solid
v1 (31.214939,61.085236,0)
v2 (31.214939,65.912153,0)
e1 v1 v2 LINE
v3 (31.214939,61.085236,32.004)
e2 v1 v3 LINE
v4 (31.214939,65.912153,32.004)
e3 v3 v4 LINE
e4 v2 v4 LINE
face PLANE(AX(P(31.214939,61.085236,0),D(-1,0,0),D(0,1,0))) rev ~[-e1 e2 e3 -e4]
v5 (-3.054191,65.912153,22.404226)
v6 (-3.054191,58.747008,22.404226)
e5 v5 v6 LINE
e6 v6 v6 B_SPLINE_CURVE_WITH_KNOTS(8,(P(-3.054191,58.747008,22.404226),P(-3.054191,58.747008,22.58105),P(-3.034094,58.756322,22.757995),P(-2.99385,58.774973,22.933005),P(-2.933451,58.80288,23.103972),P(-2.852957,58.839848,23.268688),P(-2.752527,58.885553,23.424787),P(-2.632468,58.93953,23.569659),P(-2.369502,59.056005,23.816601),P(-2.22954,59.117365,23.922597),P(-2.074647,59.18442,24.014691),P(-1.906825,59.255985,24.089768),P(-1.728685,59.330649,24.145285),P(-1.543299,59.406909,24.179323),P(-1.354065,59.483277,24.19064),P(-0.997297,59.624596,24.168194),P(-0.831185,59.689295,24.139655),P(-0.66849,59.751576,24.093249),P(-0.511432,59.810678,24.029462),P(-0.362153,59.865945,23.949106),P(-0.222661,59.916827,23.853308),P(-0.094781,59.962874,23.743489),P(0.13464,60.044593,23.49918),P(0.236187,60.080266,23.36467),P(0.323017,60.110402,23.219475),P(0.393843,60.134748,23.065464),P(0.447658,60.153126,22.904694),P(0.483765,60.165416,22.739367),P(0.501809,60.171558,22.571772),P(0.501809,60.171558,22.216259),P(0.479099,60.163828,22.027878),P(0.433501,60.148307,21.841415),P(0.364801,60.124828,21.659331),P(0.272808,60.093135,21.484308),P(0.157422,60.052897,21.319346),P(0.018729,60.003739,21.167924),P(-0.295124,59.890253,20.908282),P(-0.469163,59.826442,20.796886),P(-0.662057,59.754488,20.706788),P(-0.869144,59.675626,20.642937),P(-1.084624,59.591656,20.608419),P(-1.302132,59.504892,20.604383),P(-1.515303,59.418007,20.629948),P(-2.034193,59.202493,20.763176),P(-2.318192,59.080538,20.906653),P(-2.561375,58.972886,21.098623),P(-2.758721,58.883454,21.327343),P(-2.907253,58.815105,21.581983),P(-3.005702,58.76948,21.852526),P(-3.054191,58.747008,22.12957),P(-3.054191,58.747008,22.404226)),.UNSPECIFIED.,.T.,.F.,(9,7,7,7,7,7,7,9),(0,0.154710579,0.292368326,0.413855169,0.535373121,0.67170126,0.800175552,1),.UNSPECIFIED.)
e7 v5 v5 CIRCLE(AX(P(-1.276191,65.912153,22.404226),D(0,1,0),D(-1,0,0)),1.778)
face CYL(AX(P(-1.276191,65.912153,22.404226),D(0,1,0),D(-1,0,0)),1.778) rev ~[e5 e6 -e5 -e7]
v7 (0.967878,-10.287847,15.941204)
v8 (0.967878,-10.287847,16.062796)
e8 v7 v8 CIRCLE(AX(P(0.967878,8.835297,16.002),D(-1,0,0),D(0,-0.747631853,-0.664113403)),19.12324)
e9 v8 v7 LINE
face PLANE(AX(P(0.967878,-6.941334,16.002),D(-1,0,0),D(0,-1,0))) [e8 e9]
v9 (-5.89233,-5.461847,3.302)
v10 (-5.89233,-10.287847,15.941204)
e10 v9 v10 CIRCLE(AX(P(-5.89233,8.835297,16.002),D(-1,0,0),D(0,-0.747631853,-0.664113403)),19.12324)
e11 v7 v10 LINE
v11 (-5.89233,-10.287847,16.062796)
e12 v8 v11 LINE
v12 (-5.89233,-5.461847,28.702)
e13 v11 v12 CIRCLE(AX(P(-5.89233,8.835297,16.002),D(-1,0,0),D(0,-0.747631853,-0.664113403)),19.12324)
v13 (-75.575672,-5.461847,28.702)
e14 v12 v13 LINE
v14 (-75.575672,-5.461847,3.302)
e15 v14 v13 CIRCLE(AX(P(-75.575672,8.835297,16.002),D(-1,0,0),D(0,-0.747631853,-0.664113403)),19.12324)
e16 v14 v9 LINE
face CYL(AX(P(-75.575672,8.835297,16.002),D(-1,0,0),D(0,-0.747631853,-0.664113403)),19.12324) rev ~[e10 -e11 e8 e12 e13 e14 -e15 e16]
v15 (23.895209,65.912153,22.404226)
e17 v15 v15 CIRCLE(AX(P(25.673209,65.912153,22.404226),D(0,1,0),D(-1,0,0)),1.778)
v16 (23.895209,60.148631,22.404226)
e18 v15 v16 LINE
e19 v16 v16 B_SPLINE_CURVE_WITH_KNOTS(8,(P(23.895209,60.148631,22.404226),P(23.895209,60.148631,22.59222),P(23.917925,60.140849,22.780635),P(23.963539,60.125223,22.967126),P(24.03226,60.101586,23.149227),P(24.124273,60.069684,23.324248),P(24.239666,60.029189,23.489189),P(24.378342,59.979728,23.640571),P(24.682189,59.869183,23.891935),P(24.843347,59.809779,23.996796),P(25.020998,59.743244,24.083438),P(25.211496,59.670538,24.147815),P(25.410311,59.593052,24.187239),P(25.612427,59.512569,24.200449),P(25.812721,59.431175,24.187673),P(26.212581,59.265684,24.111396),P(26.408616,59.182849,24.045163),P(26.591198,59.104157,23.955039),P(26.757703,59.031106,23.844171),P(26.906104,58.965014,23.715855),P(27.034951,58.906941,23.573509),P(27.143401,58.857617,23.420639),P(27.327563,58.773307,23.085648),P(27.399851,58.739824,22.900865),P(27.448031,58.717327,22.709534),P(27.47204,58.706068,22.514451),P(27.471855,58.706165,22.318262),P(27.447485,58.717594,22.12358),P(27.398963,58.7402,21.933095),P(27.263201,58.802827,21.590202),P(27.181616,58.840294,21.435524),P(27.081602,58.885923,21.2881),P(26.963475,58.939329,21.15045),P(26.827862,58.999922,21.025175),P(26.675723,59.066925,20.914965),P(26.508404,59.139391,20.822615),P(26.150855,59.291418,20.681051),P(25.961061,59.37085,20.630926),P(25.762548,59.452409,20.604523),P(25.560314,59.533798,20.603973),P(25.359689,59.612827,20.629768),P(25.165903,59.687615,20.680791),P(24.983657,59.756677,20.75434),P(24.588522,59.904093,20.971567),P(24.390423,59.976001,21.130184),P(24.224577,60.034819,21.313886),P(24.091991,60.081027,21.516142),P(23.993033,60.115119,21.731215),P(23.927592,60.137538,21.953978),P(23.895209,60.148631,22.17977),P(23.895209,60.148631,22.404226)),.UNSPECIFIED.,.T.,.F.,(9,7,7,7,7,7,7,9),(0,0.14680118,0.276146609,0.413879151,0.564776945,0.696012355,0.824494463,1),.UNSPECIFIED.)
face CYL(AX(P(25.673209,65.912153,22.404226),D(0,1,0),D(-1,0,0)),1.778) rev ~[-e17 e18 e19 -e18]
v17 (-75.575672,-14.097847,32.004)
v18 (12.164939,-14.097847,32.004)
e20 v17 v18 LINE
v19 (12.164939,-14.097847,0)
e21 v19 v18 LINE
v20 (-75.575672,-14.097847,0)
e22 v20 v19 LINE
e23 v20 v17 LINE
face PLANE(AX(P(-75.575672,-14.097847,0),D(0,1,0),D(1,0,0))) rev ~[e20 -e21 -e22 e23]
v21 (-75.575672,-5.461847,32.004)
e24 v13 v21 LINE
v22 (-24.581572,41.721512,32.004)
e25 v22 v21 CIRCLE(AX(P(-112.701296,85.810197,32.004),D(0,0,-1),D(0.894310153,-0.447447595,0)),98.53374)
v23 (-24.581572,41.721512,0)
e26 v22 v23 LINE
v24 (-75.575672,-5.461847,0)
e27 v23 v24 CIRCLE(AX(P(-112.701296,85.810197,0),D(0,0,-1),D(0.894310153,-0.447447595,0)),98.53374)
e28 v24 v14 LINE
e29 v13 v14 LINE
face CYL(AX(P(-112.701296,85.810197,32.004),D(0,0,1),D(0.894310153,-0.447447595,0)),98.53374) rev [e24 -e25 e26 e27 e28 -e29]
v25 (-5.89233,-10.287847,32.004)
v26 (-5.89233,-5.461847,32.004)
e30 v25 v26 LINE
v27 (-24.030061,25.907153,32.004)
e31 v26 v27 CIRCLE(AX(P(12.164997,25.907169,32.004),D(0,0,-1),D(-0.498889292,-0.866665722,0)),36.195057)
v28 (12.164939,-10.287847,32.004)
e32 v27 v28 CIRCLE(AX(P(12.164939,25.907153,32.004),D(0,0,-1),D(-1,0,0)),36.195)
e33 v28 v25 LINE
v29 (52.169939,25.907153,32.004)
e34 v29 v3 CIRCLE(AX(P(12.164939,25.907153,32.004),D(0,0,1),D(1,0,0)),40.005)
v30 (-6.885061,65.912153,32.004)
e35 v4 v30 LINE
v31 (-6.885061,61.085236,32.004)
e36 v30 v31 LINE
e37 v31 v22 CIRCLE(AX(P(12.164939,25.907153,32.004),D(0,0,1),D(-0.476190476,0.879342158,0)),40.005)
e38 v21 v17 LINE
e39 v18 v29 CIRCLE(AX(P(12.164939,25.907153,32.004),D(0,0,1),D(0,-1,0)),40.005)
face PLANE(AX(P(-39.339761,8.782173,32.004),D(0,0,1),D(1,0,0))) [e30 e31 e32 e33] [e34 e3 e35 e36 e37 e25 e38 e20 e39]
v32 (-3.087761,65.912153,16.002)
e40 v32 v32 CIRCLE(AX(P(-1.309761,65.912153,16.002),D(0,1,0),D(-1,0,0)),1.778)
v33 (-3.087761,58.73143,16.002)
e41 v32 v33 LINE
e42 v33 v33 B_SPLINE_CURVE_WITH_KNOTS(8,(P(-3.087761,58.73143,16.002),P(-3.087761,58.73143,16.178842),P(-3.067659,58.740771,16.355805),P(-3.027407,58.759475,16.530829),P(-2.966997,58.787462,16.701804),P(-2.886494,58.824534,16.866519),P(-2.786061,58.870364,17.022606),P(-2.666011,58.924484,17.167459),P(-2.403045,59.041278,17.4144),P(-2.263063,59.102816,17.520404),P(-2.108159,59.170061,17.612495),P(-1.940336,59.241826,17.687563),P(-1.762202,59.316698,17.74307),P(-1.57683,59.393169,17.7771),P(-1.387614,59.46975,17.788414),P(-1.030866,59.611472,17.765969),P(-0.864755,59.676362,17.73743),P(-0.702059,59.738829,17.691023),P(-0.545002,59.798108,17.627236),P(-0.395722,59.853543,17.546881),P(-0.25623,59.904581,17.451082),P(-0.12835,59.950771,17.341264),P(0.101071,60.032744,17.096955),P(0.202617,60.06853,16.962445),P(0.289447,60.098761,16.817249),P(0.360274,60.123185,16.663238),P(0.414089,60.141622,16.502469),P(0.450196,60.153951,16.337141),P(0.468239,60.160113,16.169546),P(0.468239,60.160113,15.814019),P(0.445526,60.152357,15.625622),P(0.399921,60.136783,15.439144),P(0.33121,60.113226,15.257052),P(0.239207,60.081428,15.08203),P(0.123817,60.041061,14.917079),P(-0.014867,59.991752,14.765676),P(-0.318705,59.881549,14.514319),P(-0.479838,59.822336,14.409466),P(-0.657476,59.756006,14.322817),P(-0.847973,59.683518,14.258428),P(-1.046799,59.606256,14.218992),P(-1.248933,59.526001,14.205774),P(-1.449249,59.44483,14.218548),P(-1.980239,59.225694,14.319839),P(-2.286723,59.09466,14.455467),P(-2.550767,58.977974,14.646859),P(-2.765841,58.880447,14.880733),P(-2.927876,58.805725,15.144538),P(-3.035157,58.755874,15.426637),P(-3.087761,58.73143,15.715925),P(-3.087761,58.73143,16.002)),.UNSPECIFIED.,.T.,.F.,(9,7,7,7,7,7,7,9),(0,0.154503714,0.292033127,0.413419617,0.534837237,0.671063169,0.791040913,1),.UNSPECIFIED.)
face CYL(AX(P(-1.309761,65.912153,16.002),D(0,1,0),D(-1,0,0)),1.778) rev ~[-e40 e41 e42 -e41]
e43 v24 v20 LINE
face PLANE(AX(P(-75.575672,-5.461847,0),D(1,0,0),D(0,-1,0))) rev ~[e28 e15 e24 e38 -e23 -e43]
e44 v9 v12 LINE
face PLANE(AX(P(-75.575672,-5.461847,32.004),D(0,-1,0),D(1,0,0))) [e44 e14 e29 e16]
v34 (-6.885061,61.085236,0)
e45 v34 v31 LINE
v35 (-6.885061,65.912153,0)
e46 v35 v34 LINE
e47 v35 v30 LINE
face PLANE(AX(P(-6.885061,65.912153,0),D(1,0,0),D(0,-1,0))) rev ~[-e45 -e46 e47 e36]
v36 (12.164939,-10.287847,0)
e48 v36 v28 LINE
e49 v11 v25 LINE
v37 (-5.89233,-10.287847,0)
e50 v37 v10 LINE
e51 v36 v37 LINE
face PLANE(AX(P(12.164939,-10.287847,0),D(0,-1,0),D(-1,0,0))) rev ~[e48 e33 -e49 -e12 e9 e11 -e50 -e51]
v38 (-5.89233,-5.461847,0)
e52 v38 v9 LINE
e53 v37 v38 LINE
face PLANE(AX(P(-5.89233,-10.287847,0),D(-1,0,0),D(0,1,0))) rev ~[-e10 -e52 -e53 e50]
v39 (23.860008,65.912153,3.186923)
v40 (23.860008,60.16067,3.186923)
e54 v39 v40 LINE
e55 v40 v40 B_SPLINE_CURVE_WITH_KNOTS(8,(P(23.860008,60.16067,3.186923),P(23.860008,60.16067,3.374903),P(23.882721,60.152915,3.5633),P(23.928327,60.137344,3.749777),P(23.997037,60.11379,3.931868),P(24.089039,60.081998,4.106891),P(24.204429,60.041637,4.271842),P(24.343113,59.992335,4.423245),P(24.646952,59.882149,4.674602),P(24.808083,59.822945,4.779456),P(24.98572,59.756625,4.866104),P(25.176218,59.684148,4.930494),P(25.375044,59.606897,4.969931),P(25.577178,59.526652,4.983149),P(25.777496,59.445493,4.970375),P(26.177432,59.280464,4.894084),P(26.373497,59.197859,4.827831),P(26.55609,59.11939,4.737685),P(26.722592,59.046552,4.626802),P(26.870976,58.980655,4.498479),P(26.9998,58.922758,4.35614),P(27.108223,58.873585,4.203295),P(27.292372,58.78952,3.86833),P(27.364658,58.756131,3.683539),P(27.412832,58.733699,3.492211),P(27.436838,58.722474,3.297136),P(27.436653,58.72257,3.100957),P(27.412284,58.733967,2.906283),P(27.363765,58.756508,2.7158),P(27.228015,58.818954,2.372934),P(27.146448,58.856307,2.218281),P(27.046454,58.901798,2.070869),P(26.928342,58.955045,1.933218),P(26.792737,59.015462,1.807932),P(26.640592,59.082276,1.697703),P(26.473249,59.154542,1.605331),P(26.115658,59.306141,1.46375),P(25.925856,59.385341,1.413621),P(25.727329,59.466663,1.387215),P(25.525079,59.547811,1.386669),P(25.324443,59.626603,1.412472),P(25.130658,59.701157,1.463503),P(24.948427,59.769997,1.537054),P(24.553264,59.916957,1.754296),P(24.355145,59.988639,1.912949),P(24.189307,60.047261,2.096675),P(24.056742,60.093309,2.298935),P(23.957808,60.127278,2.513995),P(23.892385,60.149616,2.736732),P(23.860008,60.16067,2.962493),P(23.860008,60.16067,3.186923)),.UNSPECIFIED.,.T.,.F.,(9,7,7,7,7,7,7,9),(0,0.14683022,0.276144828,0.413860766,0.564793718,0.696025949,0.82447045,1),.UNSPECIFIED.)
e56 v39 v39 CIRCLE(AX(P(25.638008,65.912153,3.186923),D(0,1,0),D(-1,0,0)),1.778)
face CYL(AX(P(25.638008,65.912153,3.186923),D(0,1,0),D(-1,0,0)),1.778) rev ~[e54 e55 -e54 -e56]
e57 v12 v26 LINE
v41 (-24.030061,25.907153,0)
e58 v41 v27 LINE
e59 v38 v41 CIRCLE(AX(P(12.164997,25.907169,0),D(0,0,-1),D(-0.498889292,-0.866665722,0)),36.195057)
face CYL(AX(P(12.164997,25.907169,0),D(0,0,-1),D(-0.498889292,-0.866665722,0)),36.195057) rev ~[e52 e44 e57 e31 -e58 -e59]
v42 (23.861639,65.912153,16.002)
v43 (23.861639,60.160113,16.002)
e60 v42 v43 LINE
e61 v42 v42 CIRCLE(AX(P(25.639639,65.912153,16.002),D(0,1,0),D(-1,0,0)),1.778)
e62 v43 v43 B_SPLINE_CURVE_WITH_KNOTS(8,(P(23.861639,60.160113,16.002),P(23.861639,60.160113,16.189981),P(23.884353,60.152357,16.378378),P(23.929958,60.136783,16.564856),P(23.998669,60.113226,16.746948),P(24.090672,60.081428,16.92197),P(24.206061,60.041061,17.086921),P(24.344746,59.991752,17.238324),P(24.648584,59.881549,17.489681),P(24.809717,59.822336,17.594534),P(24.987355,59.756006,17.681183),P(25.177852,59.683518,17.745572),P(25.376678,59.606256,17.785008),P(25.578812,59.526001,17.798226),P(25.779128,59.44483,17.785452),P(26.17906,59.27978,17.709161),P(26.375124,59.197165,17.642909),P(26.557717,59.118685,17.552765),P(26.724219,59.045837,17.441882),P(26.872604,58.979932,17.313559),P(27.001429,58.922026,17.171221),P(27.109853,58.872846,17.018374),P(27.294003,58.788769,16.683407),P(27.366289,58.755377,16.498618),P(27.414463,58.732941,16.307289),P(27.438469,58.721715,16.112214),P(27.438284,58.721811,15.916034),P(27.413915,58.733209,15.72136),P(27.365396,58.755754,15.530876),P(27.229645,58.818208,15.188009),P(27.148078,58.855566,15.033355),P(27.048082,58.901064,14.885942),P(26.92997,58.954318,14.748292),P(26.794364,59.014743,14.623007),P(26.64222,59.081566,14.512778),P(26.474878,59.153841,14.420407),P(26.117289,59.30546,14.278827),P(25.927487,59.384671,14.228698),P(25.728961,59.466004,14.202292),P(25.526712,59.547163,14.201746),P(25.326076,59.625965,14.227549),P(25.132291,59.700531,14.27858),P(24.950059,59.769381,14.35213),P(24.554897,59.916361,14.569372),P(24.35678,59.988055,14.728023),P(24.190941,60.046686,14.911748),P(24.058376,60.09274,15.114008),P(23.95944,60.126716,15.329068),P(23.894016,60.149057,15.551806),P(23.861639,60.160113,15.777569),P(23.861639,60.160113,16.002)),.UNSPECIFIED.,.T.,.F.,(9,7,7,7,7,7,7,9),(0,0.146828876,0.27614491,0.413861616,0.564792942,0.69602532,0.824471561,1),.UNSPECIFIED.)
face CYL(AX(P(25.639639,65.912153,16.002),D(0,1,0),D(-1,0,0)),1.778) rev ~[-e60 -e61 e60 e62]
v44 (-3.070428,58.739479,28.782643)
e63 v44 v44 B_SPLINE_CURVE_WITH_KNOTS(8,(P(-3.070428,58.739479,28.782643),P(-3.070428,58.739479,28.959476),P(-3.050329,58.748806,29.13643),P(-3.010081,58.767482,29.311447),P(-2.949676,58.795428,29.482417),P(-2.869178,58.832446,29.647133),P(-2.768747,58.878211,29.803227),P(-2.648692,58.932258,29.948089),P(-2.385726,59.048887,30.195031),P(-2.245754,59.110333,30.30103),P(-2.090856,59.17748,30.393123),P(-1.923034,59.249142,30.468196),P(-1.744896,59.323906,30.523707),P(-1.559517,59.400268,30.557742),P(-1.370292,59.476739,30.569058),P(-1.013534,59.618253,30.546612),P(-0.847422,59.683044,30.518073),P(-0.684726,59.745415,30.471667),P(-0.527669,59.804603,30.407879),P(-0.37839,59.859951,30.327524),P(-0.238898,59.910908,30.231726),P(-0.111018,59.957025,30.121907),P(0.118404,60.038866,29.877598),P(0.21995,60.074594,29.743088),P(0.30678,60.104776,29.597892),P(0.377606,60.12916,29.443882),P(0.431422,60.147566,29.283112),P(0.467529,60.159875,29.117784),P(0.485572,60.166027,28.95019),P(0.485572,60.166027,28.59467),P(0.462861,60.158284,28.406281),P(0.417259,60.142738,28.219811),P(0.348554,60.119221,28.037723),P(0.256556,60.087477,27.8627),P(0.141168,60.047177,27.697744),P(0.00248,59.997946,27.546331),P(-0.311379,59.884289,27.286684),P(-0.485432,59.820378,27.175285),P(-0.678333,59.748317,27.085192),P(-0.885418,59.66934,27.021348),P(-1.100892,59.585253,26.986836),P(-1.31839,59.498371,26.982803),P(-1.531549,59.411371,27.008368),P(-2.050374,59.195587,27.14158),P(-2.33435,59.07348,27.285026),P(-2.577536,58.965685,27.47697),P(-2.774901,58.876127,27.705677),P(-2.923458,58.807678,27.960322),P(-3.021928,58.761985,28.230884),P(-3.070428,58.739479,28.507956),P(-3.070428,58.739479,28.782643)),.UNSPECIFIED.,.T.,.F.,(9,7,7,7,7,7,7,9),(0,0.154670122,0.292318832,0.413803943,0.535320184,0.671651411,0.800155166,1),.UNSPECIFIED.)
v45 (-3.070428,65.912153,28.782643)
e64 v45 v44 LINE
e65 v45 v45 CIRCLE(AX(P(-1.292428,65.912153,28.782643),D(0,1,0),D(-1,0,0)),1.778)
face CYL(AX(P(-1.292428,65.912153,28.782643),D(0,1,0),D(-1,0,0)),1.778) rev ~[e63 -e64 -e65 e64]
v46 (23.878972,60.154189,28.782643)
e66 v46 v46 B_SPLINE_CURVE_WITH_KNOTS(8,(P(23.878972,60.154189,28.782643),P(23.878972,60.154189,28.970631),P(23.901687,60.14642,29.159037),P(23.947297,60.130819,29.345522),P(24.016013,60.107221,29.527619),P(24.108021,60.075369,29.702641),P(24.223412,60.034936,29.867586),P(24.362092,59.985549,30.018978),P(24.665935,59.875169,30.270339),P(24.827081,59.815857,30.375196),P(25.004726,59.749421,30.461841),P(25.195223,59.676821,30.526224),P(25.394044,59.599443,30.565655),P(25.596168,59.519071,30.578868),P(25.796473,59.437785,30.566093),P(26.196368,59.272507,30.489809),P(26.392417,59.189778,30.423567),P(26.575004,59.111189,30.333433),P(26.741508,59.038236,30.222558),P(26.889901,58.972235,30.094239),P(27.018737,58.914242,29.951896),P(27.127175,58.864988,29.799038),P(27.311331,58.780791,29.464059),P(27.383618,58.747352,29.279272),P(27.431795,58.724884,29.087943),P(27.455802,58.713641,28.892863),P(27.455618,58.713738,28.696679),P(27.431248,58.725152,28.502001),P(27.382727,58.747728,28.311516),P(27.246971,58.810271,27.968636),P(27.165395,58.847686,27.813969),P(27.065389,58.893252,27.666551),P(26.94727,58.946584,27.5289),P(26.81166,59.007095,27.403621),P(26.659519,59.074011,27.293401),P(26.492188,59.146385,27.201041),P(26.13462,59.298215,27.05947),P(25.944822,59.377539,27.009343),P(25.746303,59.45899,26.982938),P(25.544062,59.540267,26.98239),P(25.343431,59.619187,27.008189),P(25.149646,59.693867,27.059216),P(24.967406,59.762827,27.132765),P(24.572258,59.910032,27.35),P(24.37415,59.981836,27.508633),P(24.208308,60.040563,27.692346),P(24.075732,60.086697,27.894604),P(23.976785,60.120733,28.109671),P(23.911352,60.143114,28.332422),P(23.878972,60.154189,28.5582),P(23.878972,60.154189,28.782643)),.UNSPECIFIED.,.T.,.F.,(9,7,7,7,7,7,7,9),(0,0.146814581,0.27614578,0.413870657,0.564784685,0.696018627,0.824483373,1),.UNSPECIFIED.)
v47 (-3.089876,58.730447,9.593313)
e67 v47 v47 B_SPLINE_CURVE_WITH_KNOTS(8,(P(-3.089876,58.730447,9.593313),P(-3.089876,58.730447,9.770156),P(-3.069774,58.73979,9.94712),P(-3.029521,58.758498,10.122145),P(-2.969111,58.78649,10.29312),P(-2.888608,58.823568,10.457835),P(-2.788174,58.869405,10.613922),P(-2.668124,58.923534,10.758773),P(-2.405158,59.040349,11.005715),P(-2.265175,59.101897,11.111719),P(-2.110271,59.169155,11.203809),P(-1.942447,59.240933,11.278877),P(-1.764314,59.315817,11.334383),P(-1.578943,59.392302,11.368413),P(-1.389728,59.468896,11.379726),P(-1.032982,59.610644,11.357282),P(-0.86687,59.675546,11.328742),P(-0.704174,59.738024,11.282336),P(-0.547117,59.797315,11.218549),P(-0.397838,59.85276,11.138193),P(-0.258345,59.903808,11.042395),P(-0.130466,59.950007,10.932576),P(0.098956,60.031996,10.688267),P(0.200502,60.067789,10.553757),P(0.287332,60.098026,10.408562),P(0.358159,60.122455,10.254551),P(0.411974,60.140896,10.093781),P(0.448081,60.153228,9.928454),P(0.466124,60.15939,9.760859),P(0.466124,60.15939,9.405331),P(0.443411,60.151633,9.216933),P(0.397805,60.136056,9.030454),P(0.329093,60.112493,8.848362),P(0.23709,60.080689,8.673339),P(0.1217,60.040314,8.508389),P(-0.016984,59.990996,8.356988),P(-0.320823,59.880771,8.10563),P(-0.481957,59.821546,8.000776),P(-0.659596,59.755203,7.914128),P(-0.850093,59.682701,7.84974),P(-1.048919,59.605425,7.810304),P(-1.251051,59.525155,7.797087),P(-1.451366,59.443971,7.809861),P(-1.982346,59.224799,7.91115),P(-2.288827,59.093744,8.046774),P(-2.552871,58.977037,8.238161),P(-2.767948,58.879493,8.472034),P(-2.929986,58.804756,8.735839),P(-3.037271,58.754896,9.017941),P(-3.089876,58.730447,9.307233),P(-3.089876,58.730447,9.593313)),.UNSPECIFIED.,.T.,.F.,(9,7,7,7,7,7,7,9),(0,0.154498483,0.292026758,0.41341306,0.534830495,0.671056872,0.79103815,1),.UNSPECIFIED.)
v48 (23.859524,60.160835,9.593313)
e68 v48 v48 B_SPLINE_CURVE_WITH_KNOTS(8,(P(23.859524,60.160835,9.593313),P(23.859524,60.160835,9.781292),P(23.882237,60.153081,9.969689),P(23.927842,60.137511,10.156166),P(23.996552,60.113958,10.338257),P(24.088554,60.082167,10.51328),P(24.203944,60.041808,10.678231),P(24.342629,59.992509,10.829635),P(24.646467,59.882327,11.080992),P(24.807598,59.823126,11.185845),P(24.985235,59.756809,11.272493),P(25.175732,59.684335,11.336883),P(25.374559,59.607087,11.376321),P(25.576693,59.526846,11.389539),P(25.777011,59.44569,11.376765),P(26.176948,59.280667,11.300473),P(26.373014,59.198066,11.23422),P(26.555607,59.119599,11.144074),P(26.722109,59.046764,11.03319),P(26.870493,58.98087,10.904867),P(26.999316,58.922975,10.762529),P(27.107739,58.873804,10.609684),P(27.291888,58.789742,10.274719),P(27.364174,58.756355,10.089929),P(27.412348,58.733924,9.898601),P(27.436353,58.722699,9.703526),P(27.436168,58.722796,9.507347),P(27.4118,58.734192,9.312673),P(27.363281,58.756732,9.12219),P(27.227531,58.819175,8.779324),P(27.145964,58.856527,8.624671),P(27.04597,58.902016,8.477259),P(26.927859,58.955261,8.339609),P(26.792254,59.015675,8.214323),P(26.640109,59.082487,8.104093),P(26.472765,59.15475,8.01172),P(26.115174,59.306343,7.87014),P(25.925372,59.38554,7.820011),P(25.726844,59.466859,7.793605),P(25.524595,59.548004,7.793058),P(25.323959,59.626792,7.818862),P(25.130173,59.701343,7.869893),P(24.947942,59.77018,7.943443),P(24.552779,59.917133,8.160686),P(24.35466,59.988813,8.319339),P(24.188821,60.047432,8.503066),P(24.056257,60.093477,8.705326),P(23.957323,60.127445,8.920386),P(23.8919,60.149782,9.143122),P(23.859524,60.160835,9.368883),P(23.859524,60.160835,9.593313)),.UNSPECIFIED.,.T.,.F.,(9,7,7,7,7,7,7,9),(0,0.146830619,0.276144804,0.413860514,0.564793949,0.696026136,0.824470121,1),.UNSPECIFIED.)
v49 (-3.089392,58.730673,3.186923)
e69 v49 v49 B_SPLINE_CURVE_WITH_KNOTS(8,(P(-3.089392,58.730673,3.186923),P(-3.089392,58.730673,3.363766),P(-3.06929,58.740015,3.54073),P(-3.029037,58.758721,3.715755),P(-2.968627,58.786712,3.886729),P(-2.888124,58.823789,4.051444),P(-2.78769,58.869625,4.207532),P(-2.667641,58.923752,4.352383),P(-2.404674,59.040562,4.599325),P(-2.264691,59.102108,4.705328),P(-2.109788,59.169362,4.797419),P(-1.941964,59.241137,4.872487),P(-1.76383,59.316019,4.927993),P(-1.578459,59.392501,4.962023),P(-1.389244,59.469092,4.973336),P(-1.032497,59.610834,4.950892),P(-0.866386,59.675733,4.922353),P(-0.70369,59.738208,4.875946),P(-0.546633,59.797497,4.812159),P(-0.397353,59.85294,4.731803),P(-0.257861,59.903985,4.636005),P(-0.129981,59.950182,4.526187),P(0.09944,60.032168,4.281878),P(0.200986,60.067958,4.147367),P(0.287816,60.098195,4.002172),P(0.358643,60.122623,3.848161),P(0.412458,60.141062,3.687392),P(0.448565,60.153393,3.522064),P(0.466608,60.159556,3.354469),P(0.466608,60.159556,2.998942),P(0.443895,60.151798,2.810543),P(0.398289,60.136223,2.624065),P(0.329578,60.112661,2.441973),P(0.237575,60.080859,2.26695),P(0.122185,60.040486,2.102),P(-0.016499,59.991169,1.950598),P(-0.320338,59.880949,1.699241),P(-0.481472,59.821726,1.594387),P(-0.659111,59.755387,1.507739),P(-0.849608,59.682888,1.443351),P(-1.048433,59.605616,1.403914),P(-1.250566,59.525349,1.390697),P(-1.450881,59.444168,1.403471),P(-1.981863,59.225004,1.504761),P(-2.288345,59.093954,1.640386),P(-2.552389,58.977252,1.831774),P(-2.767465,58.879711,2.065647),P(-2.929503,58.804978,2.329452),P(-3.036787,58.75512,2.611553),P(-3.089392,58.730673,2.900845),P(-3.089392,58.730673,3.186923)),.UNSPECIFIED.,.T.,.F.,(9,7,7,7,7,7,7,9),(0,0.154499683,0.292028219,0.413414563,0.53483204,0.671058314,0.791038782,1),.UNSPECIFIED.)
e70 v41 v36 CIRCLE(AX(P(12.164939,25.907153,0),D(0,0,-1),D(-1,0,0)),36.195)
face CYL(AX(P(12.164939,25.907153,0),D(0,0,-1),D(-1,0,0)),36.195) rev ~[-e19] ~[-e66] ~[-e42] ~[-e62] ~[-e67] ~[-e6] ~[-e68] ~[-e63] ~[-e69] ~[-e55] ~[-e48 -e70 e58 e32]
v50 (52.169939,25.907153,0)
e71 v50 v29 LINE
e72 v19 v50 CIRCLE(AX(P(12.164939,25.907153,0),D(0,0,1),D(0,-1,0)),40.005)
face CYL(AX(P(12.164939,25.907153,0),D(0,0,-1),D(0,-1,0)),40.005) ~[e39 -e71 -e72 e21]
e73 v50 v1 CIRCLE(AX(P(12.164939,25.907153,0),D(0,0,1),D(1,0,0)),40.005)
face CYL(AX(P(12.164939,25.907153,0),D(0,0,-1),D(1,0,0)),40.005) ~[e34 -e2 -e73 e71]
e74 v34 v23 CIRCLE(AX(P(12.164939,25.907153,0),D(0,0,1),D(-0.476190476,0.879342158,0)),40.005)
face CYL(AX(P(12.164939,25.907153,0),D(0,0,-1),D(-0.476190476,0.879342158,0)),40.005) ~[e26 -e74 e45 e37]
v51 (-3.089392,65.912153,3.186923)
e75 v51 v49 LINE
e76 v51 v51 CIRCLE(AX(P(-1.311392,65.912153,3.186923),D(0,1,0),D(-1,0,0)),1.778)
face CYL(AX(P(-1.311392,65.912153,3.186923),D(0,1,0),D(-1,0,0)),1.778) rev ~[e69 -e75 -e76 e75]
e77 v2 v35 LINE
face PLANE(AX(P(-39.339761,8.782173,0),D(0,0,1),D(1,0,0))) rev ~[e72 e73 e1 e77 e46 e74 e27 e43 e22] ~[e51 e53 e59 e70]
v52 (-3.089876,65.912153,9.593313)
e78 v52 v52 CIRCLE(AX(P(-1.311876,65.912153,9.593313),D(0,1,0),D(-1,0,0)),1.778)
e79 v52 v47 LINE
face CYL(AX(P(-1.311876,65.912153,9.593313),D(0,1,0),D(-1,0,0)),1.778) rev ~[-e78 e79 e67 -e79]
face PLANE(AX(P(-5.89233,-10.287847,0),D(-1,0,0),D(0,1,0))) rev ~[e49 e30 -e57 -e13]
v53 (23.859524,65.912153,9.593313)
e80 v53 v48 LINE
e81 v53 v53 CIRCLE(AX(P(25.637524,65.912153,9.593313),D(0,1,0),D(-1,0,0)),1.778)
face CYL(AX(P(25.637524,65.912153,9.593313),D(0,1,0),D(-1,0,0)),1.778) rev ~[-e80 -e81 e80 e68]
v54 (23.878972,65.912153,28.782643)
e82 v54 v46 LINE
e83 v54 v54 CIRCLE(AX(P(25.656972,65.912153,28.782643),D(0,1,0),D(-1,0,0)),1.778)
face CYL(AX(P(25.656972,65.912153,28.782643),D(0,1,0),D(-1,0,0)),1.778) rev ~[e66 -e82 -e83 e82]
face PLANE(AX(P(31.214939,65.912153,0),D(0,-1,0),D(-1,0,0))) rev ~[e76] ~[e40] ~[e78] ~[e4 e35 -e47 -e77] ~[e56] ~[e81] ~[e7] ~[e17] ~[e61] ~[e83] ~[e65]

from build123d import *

# Parameters (mm, degrees)
F1_DEPTH = 32.004
F3_DEPTH = 76.54355
F4_R     = 1.778
F5_DEPTH = 44.60469
F7_DEPTH = 32.004


# Not quite as in the source:
# - ends of sketch curves that miss each other by under 0.0002 mm in the source are joined


with BuildPart() as f1:
    # F0 (on Top) → F1 (new body)
    with BuildSketch(Plane.XY):
        with BuildLine():
            Line((-6.8850605494, 65.9121533447), (-6.8850605494, 61.0852363653))
            ThreePointArc((-6.8850605494, 61.0852363653), (-22.2043438922, 46.3803648051), (-27.8400605494, 25.9071533447))
            ThreePointArc((-27.8400605494, 25.9071533447), (-23.8462320221, 8.4831597105), (-12.6621800762, -5.4618466553))
            Line((-12.6621800762, -5.4618466553), (-75.5756720901, -5.4618466553))
            Line((-75.5756720901, -5.4618466553), (-75.5756720901, -14.0978466553))
            Line((-75.5756720901, -14.0978466553), (12.1649394506, -14.0978466553))
            ThreePointArc((12.1649394506, -14.0978466553), (40.452746232, -2.3806534366), (52.1699394506, 25.9071533447))
            ThreePointArc((52.1699394506, 25.9071533447), (46.5342227935, 46.3803648051), (31.2149394506, 61.0852363653))
            Line((31.2149394506, 61.0852363653), (31.2149394506, 65.9121533447))
            Line((31.2149394506, 65.9121533447), (12.1649394506, 65.9121533447))
            Line((12.1649394506, 65.9121533447), (-6.8850605494, 65.9121533447))
        make_face()
        with BuildLine():
            Line((-5.8923298493, -10.2878466553), (-5.8923298493, -5.4618466553))
            ThreePointArc((-5.8923298493, -5.4618466553), (-19.1692254039, 7.7895338028), (-24.0300605494, 25.9071533447))
            ThreePointArc((-24.0300605494, 25.9071533447), (12.1649394506, 62.1021533447), (48.3599394506, 25.9071533447))
            ThreePointArc((48.3599394506, 25.9071533447), (37.7586693957, 0.3134233997), (12.1649394506, -10.2878466553))
            Line((12.1649394506, -10.2878466553), (-5.8923298493, -10.2878466553))
        make_face(mode=Mode.SUBTRACT)
    extrude(amount=F1_DEPTH)

    # F2 (on face) → F3 (cut)
    with BuildSketch(Plane(origin=(-75.5756720901, 0, 0), x_dir=(0, -1, 0), z_dir=(-1, 0, 0))):
        with BuildLine():
            Line((5.4618466553, 28.702), (5.4618466553, 3.302))
            ThreePointArc((5.4618466553, 3.302), (10.2879432961, 16.002), (5.4618466553, 28.702))
        make_face()
    extrude(amount=-F3_DEPTH, mode=Mode.SUBTRACT)

    # F4 (on face) → F5 (cut)
    with BuildSketch(Plane(origin=(0, 65.9121533447, 0), x_dir=(-1, 0, 0), z_dir=(0, 1, 0))):
        with Locations((-25.6732087171, 22.4042255431)):
            Circle(F4_R)
        with Locations((-25.6569720394, 28.7826433778)):
            Circle(F4_R)
        with Locations((-25.6396394506, 16.002)):
            Circle(F4_R)
        with Locations((-25.6375241614, 9.5933126286)):
            Circle(F4_R)
        with Locations((-25.6380084491, 3.1869229861)):
            Circle(F4_R)
        with Locations((1.3113915509, 3.1869229861)):
            Circle(F4_R)
        with Locations((1.3118758386, 9.5933126286)):
            Circle(F4_R)
        with Locations((1.3097605494, 16.002)):
            Circle(F4_R)
        with Locations((1.2761912829, 22.4042255431)):
            Circle(F4_R)
        with Locations((1.2924279606, 28.7826433778)):
            Circle(F4_R)
    extrude(amount=-F5_DEPTH, mode=Mode.SUBTRACT)

    # F6 (on face) → F7 (join)
    with BuildSketch(Plane.XY.offset(32.004)):
        with BuildLine():
            ThreePointArc((-24.5815716288, 41.7215122786), (-45.7821906846, 13.486402418), (-75.5756720901, -5.4618466553))
            Line((-75.5756720901, -5.4618466553), (-12.6621800762, -5.4618466553))
            ThreePointArc((-12.6621800762, -5.4618466553), (-23.9121515851, 16.7934110455), (-24.5815716288, 41.7215122786))
        make_face()
    extrude(amount=-F7_DEPTH)


solid = f1.part
